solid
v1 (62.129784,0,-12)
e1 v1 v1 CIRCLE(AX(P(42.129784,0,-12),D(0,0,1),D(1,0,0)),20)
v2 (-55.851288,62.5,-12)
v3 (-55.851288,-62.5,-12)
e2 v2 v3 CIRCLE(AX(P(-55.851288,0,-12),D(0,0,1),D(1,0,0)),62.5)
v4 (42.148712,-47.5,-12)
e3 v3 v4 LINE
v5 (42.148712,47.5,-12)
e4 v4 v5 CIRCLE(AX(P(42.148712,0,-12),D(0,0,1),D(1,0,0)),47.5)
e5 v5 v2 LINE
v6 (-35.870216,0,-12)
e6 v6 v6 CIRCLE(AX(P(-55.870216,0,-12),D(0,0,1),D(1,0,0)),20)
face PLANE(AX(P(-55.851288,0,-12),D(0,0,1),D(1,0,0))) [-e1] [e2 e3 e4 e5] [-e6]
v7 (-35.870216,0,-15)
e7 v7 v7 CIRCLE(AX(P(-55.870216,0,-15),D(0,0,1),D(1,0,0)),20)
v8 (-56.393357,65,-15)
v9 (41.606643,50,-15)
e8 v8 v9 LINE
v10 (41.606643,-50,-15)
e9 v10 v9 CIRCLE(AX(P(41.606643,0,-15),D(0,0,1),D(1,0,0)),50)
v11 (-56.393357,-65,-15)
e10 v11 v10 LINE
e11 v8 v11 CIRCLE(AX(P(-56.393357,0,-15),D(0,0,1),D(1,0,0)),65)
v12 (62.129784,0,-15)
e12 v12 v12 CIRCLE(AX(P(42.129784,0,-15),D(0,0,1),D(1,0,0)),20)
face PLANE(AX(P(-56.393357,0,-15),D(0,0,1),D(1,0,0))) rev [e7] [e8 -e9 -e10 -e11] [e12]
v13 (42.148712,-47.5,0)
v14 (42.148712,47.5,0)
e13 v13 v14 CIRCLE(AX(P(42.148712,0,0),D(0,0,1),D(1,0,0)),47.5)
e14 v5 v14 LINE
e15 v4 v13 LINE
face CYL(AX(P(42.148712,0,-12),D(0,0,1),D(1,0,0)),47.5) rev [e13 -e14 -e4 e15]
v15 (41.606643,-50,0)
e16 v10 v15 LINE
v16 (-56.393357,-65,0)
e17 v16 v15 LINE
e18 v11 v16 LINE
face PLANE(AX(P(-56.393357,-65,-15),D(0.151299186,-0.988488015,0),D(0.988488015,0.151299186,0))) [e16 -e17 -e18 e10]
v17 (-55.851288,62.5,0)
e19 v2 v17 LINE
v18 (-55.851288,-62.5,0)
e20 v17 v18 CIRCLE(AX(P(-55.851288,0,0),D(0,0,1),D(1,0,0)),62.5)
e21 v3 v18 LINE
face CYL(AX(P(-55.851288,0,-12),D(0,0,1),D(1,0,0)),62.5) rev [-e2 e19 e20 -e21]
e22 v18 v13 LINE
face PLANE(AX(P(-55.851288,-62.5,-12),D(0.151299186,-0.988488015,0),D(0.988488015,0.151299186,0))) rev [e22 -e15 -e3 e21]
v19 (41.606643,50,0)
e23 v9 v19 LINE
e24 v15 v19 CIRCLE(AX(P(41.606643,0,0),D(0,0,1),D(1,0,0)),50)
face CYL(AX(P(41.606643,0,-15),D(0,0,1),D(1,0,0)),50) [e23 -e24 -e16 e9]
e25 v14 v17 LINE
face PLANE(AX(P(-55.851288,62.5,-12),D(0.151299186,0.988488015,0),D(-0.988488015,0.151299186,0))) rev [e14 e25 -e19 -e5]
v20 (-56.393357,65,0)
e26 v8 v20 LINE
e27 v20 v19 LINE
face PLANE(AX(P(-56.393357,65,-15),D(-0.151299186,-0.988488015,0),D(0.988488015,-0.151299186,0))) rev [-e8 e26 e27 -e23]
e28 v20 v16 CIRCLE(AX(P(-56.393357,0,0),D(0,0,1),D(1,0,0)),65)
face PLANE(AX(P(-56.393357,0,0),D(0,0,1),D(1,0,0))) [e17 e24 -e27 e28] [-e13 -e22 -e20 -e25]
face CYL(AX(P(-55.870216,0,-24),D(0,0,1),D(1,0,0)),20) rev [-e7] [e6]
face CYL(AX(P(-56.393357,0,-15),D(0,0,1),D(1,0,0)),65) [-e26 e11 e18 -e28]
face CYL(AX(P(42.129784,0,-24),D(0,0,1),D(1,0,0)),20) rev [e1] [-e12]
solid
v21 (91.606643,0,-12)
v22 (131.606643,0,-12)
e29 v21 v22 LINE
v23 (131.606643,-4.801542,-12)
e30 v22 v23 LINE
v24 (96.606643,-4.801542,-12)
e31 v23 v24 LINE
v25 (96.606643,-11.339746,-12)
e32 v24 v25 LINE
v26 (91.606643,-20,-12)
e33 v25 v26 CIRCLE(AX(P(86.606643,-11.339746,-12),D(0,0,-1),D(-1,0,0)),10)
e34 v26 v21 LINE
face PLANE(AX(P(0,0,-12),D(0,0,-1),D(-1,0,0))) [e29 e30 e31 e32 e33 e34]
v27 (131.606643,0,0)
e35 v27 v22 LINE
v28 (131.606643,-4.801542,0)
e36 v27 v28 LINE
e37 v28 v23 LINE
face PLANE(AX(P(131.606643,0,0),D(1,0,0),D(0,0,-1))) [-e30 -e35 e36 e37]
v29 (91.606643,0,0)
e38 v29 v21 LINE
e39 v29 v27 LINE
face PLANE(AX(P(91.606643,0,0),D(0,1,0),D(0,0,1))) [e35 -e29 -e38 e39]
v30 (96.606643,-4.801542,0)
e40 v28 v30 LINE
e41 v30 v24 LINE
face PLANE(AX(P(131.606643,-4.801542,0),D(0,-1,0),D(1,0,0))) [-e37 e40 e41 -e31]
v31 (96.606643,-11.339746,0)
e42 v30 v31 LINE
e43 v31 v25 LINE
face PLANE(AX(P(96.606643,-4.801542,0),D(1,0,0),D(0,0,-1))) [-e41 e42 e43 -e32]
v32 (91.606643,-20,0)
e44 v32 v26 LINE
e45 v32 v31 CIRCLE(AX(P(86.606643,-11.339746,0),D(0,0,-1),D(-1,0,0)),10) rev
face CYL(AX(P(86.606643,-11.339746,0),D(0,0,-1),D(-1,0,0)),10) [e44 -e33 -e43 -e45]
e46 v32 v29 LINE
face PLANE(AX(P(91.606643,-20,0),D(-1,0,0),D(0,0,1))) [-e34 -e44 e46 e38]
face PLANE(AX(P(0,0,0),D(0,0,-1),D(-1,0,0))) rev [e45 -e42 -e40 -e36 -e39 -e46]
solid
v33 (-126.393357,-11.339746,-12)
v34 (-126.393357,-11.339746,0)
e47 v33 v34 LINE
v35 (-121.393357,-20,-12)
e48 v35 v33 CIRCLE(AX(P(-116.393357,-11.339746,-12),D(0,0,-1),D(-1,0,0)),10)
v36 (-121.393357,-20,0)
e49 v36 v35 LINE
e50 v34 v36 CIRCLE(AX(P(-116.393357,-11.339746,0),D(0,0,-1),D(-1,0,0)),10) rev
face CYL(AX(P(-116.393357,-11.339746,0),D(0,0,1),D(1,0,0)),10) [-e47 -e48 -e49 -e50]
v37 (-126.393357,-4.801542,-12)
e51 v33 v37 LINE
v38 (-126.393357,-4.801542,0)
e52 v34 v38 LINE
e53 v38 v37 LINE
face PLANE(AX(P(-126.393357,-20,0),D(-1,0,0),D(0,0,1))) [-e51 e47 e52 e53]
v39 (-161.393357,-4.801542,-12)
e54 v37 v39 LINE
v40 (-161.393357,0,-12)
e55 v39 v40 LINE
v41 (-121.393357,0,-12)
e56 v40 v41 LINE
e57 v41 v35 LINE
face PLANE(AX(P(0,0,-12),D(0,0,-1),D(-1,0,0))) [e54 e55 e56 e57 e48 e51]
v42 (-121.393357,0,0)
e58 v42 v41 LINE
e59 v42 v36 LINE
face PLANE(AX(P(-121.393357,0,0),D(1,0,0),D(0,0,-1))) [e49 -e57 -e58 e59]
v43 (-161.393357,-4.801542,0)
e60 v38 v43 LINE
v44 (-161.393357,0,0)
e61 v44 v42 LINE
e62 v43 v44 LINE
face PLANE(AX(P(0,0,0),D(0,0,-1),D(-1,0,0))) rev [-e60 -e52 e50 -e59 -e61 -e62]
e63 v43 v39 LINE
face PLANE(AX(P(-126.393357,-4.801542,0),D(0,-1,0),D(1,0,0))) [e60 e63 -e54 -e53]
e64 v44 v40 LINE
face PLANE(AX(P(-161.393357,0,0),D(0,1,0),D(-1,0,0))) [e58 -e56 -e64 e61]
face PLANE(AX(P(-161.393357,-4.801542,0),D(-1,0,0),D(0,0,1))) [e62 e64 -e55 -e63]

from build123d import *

# Parameters (mm, degrees)
BOSS_EXTRUDE1_DEPTH   = 15
CUT_EXTRUDE1_DEPTH    = 12
SKETCH3_R             = 20
CUT_EXTRUDE2_DEPTH    = 12
BOSS_EXTRUDE2_DEPTH   = 12
BOSS_EXTRUDE2_2_DEPTH = 12
FILLET1_R             = 10
FILLET2_R             = 10


with BuildPart() as part:
    # Sketch1 → Boss-Extrude1 (new body)
    with BuildSketch(Plane.XY):
        with BuildLine():
            Line((-56.393356643, 65), (41.606643357, 50))
            ThreePointArc((41.606643357, 50), (91.606643357, 0), (41.606643357, -50))
            Line((41.606643357, -50), (-56.393356643, -65))
            ThreePointArc((-56.393356643, -65), (-121.393356643, 0), (-56.393356643, 65))
        make_face()
    extrude(amount=-BOSS_EXTRUDE1_DEPTH)

    # Sketch2 → Cut-Extrude1 (cut)
    with BuildSketch(Plane.XY):
        with BuildLine():
            Line((-55.851288068, 62.5), (42.148711932, 47.5))
            ThreePointArc((42.148711932, 47.5), (89.648711932, 0), (42.148711932, -47.5))
            Line((42.148711932, -47.5), (-55.851288068, -62.5))
            ThreePointArc((-55.851288068, -62.5), (-118.351288068, 0), (-55.851288068, 62.5))
        make_face()
    extrude(amount=-CUT_EXTRUDE1_DEPTH, mode=Mode.SUBTRACT)

    # Sketch3 → Cut-Extrude2 (cut)
    with BuildSketch(Plane.XY.offset(-12)):
        with Locations((-55.870216449, 0)):
            Circle(SKETCH3_R)
        with Locations((42.129783551, 0)):
            Circle(SKETCH3_R)
    extrude(amount=-CUT_EXTRUDE2_DEPTH, mode=Mode.SUBTRACT)


with BuildPart() as body_2:
    # Sketch4 → Boss-Extrude2 (new body)
    with BuildSketch(Plane.XY.offset(-12)):
        Polygon((-161.393356643, 0), (-121.393356643, 0), (-121.393356643, -20), (-126.393356643, -20), (-126.393356643, -4.801542048), (-161.393356643, -4.801542048), align=None)
    extrude(amount=BOSS_EXTRUDE2_DEPTH)

    # Fillet1
    # the kernel refuses this fillet: 10 mm, written as the material it takes off along each edge
    with BuildSketch(Plane(origin=(-126.393356643, -20, -33.650635095), x_dir=(1, 0, 0), z_dir=(0, 0, 1))) as fillet1_piece_1:
        with BuildLine():
            CenterArc((10, 8.660254038), FILLET1_R, 180, 60)
            Line((0, 8.660254038), (-0.2, 8.660254038))
            Line((-0.2, 8.660254038), (-0.2, 0))
            Line((-0.2, 0), (0, -0.2))
            ThreePointArc((0, -0.2), (2.5, -0.2), (4.9, -0.173205081))
            Line((4.9, -0.173205081), (5, 0))
        make_face()
    extrude(amount=55.301270189, mode=Mode.SUBTRACT)


with BuildPart() as body_3:
    # Sketch4 → Boss-Extrude2 2 (new body)
    with BuildSketch(Plane.XY.offset(-12)):
        Polygon((91.606643357, 0), (131.606643357, 0), (131.606643357, -4.801542048), (96.606643357, -4.801542048), (96.606643357, -20), (91.606643357, -20), align=None)
    extrude(amount=BOSS_EXTRUDE2_2_DEPTH)

    # Fillet2
    # the kernel refuses this fillet: 10 mm, written as the material it takes off along each edge
    with BuildSketch(Plane(origin=(96.606643357, -20, -33.650635095), x_dir=(0, 1, 0), z_dir=(0, 0, 1))) as fillet2_piece_1:
        with BuildLine():
            CenterArc((8.660254038, 10), FILLET2_R, 210, 60)
            Line((0, 5), (-0.173205081, 4.9))
            ThreePointArc((-0.173205081, 4.9), (-0.2, 2.5), (-0.2, 0))
            Line((-0.2, 0), (0, -0.2))
            Line((0, -0.2), (8.660254038, -0.2))
            Line((8.660254038, -0.2), (8.660254038, 0))
        make_face()
    extrude(amount=55.301270189, mode=Mode.SUBTRACT)


solid = Compound([part.part, body_2.part, body_3.part])
